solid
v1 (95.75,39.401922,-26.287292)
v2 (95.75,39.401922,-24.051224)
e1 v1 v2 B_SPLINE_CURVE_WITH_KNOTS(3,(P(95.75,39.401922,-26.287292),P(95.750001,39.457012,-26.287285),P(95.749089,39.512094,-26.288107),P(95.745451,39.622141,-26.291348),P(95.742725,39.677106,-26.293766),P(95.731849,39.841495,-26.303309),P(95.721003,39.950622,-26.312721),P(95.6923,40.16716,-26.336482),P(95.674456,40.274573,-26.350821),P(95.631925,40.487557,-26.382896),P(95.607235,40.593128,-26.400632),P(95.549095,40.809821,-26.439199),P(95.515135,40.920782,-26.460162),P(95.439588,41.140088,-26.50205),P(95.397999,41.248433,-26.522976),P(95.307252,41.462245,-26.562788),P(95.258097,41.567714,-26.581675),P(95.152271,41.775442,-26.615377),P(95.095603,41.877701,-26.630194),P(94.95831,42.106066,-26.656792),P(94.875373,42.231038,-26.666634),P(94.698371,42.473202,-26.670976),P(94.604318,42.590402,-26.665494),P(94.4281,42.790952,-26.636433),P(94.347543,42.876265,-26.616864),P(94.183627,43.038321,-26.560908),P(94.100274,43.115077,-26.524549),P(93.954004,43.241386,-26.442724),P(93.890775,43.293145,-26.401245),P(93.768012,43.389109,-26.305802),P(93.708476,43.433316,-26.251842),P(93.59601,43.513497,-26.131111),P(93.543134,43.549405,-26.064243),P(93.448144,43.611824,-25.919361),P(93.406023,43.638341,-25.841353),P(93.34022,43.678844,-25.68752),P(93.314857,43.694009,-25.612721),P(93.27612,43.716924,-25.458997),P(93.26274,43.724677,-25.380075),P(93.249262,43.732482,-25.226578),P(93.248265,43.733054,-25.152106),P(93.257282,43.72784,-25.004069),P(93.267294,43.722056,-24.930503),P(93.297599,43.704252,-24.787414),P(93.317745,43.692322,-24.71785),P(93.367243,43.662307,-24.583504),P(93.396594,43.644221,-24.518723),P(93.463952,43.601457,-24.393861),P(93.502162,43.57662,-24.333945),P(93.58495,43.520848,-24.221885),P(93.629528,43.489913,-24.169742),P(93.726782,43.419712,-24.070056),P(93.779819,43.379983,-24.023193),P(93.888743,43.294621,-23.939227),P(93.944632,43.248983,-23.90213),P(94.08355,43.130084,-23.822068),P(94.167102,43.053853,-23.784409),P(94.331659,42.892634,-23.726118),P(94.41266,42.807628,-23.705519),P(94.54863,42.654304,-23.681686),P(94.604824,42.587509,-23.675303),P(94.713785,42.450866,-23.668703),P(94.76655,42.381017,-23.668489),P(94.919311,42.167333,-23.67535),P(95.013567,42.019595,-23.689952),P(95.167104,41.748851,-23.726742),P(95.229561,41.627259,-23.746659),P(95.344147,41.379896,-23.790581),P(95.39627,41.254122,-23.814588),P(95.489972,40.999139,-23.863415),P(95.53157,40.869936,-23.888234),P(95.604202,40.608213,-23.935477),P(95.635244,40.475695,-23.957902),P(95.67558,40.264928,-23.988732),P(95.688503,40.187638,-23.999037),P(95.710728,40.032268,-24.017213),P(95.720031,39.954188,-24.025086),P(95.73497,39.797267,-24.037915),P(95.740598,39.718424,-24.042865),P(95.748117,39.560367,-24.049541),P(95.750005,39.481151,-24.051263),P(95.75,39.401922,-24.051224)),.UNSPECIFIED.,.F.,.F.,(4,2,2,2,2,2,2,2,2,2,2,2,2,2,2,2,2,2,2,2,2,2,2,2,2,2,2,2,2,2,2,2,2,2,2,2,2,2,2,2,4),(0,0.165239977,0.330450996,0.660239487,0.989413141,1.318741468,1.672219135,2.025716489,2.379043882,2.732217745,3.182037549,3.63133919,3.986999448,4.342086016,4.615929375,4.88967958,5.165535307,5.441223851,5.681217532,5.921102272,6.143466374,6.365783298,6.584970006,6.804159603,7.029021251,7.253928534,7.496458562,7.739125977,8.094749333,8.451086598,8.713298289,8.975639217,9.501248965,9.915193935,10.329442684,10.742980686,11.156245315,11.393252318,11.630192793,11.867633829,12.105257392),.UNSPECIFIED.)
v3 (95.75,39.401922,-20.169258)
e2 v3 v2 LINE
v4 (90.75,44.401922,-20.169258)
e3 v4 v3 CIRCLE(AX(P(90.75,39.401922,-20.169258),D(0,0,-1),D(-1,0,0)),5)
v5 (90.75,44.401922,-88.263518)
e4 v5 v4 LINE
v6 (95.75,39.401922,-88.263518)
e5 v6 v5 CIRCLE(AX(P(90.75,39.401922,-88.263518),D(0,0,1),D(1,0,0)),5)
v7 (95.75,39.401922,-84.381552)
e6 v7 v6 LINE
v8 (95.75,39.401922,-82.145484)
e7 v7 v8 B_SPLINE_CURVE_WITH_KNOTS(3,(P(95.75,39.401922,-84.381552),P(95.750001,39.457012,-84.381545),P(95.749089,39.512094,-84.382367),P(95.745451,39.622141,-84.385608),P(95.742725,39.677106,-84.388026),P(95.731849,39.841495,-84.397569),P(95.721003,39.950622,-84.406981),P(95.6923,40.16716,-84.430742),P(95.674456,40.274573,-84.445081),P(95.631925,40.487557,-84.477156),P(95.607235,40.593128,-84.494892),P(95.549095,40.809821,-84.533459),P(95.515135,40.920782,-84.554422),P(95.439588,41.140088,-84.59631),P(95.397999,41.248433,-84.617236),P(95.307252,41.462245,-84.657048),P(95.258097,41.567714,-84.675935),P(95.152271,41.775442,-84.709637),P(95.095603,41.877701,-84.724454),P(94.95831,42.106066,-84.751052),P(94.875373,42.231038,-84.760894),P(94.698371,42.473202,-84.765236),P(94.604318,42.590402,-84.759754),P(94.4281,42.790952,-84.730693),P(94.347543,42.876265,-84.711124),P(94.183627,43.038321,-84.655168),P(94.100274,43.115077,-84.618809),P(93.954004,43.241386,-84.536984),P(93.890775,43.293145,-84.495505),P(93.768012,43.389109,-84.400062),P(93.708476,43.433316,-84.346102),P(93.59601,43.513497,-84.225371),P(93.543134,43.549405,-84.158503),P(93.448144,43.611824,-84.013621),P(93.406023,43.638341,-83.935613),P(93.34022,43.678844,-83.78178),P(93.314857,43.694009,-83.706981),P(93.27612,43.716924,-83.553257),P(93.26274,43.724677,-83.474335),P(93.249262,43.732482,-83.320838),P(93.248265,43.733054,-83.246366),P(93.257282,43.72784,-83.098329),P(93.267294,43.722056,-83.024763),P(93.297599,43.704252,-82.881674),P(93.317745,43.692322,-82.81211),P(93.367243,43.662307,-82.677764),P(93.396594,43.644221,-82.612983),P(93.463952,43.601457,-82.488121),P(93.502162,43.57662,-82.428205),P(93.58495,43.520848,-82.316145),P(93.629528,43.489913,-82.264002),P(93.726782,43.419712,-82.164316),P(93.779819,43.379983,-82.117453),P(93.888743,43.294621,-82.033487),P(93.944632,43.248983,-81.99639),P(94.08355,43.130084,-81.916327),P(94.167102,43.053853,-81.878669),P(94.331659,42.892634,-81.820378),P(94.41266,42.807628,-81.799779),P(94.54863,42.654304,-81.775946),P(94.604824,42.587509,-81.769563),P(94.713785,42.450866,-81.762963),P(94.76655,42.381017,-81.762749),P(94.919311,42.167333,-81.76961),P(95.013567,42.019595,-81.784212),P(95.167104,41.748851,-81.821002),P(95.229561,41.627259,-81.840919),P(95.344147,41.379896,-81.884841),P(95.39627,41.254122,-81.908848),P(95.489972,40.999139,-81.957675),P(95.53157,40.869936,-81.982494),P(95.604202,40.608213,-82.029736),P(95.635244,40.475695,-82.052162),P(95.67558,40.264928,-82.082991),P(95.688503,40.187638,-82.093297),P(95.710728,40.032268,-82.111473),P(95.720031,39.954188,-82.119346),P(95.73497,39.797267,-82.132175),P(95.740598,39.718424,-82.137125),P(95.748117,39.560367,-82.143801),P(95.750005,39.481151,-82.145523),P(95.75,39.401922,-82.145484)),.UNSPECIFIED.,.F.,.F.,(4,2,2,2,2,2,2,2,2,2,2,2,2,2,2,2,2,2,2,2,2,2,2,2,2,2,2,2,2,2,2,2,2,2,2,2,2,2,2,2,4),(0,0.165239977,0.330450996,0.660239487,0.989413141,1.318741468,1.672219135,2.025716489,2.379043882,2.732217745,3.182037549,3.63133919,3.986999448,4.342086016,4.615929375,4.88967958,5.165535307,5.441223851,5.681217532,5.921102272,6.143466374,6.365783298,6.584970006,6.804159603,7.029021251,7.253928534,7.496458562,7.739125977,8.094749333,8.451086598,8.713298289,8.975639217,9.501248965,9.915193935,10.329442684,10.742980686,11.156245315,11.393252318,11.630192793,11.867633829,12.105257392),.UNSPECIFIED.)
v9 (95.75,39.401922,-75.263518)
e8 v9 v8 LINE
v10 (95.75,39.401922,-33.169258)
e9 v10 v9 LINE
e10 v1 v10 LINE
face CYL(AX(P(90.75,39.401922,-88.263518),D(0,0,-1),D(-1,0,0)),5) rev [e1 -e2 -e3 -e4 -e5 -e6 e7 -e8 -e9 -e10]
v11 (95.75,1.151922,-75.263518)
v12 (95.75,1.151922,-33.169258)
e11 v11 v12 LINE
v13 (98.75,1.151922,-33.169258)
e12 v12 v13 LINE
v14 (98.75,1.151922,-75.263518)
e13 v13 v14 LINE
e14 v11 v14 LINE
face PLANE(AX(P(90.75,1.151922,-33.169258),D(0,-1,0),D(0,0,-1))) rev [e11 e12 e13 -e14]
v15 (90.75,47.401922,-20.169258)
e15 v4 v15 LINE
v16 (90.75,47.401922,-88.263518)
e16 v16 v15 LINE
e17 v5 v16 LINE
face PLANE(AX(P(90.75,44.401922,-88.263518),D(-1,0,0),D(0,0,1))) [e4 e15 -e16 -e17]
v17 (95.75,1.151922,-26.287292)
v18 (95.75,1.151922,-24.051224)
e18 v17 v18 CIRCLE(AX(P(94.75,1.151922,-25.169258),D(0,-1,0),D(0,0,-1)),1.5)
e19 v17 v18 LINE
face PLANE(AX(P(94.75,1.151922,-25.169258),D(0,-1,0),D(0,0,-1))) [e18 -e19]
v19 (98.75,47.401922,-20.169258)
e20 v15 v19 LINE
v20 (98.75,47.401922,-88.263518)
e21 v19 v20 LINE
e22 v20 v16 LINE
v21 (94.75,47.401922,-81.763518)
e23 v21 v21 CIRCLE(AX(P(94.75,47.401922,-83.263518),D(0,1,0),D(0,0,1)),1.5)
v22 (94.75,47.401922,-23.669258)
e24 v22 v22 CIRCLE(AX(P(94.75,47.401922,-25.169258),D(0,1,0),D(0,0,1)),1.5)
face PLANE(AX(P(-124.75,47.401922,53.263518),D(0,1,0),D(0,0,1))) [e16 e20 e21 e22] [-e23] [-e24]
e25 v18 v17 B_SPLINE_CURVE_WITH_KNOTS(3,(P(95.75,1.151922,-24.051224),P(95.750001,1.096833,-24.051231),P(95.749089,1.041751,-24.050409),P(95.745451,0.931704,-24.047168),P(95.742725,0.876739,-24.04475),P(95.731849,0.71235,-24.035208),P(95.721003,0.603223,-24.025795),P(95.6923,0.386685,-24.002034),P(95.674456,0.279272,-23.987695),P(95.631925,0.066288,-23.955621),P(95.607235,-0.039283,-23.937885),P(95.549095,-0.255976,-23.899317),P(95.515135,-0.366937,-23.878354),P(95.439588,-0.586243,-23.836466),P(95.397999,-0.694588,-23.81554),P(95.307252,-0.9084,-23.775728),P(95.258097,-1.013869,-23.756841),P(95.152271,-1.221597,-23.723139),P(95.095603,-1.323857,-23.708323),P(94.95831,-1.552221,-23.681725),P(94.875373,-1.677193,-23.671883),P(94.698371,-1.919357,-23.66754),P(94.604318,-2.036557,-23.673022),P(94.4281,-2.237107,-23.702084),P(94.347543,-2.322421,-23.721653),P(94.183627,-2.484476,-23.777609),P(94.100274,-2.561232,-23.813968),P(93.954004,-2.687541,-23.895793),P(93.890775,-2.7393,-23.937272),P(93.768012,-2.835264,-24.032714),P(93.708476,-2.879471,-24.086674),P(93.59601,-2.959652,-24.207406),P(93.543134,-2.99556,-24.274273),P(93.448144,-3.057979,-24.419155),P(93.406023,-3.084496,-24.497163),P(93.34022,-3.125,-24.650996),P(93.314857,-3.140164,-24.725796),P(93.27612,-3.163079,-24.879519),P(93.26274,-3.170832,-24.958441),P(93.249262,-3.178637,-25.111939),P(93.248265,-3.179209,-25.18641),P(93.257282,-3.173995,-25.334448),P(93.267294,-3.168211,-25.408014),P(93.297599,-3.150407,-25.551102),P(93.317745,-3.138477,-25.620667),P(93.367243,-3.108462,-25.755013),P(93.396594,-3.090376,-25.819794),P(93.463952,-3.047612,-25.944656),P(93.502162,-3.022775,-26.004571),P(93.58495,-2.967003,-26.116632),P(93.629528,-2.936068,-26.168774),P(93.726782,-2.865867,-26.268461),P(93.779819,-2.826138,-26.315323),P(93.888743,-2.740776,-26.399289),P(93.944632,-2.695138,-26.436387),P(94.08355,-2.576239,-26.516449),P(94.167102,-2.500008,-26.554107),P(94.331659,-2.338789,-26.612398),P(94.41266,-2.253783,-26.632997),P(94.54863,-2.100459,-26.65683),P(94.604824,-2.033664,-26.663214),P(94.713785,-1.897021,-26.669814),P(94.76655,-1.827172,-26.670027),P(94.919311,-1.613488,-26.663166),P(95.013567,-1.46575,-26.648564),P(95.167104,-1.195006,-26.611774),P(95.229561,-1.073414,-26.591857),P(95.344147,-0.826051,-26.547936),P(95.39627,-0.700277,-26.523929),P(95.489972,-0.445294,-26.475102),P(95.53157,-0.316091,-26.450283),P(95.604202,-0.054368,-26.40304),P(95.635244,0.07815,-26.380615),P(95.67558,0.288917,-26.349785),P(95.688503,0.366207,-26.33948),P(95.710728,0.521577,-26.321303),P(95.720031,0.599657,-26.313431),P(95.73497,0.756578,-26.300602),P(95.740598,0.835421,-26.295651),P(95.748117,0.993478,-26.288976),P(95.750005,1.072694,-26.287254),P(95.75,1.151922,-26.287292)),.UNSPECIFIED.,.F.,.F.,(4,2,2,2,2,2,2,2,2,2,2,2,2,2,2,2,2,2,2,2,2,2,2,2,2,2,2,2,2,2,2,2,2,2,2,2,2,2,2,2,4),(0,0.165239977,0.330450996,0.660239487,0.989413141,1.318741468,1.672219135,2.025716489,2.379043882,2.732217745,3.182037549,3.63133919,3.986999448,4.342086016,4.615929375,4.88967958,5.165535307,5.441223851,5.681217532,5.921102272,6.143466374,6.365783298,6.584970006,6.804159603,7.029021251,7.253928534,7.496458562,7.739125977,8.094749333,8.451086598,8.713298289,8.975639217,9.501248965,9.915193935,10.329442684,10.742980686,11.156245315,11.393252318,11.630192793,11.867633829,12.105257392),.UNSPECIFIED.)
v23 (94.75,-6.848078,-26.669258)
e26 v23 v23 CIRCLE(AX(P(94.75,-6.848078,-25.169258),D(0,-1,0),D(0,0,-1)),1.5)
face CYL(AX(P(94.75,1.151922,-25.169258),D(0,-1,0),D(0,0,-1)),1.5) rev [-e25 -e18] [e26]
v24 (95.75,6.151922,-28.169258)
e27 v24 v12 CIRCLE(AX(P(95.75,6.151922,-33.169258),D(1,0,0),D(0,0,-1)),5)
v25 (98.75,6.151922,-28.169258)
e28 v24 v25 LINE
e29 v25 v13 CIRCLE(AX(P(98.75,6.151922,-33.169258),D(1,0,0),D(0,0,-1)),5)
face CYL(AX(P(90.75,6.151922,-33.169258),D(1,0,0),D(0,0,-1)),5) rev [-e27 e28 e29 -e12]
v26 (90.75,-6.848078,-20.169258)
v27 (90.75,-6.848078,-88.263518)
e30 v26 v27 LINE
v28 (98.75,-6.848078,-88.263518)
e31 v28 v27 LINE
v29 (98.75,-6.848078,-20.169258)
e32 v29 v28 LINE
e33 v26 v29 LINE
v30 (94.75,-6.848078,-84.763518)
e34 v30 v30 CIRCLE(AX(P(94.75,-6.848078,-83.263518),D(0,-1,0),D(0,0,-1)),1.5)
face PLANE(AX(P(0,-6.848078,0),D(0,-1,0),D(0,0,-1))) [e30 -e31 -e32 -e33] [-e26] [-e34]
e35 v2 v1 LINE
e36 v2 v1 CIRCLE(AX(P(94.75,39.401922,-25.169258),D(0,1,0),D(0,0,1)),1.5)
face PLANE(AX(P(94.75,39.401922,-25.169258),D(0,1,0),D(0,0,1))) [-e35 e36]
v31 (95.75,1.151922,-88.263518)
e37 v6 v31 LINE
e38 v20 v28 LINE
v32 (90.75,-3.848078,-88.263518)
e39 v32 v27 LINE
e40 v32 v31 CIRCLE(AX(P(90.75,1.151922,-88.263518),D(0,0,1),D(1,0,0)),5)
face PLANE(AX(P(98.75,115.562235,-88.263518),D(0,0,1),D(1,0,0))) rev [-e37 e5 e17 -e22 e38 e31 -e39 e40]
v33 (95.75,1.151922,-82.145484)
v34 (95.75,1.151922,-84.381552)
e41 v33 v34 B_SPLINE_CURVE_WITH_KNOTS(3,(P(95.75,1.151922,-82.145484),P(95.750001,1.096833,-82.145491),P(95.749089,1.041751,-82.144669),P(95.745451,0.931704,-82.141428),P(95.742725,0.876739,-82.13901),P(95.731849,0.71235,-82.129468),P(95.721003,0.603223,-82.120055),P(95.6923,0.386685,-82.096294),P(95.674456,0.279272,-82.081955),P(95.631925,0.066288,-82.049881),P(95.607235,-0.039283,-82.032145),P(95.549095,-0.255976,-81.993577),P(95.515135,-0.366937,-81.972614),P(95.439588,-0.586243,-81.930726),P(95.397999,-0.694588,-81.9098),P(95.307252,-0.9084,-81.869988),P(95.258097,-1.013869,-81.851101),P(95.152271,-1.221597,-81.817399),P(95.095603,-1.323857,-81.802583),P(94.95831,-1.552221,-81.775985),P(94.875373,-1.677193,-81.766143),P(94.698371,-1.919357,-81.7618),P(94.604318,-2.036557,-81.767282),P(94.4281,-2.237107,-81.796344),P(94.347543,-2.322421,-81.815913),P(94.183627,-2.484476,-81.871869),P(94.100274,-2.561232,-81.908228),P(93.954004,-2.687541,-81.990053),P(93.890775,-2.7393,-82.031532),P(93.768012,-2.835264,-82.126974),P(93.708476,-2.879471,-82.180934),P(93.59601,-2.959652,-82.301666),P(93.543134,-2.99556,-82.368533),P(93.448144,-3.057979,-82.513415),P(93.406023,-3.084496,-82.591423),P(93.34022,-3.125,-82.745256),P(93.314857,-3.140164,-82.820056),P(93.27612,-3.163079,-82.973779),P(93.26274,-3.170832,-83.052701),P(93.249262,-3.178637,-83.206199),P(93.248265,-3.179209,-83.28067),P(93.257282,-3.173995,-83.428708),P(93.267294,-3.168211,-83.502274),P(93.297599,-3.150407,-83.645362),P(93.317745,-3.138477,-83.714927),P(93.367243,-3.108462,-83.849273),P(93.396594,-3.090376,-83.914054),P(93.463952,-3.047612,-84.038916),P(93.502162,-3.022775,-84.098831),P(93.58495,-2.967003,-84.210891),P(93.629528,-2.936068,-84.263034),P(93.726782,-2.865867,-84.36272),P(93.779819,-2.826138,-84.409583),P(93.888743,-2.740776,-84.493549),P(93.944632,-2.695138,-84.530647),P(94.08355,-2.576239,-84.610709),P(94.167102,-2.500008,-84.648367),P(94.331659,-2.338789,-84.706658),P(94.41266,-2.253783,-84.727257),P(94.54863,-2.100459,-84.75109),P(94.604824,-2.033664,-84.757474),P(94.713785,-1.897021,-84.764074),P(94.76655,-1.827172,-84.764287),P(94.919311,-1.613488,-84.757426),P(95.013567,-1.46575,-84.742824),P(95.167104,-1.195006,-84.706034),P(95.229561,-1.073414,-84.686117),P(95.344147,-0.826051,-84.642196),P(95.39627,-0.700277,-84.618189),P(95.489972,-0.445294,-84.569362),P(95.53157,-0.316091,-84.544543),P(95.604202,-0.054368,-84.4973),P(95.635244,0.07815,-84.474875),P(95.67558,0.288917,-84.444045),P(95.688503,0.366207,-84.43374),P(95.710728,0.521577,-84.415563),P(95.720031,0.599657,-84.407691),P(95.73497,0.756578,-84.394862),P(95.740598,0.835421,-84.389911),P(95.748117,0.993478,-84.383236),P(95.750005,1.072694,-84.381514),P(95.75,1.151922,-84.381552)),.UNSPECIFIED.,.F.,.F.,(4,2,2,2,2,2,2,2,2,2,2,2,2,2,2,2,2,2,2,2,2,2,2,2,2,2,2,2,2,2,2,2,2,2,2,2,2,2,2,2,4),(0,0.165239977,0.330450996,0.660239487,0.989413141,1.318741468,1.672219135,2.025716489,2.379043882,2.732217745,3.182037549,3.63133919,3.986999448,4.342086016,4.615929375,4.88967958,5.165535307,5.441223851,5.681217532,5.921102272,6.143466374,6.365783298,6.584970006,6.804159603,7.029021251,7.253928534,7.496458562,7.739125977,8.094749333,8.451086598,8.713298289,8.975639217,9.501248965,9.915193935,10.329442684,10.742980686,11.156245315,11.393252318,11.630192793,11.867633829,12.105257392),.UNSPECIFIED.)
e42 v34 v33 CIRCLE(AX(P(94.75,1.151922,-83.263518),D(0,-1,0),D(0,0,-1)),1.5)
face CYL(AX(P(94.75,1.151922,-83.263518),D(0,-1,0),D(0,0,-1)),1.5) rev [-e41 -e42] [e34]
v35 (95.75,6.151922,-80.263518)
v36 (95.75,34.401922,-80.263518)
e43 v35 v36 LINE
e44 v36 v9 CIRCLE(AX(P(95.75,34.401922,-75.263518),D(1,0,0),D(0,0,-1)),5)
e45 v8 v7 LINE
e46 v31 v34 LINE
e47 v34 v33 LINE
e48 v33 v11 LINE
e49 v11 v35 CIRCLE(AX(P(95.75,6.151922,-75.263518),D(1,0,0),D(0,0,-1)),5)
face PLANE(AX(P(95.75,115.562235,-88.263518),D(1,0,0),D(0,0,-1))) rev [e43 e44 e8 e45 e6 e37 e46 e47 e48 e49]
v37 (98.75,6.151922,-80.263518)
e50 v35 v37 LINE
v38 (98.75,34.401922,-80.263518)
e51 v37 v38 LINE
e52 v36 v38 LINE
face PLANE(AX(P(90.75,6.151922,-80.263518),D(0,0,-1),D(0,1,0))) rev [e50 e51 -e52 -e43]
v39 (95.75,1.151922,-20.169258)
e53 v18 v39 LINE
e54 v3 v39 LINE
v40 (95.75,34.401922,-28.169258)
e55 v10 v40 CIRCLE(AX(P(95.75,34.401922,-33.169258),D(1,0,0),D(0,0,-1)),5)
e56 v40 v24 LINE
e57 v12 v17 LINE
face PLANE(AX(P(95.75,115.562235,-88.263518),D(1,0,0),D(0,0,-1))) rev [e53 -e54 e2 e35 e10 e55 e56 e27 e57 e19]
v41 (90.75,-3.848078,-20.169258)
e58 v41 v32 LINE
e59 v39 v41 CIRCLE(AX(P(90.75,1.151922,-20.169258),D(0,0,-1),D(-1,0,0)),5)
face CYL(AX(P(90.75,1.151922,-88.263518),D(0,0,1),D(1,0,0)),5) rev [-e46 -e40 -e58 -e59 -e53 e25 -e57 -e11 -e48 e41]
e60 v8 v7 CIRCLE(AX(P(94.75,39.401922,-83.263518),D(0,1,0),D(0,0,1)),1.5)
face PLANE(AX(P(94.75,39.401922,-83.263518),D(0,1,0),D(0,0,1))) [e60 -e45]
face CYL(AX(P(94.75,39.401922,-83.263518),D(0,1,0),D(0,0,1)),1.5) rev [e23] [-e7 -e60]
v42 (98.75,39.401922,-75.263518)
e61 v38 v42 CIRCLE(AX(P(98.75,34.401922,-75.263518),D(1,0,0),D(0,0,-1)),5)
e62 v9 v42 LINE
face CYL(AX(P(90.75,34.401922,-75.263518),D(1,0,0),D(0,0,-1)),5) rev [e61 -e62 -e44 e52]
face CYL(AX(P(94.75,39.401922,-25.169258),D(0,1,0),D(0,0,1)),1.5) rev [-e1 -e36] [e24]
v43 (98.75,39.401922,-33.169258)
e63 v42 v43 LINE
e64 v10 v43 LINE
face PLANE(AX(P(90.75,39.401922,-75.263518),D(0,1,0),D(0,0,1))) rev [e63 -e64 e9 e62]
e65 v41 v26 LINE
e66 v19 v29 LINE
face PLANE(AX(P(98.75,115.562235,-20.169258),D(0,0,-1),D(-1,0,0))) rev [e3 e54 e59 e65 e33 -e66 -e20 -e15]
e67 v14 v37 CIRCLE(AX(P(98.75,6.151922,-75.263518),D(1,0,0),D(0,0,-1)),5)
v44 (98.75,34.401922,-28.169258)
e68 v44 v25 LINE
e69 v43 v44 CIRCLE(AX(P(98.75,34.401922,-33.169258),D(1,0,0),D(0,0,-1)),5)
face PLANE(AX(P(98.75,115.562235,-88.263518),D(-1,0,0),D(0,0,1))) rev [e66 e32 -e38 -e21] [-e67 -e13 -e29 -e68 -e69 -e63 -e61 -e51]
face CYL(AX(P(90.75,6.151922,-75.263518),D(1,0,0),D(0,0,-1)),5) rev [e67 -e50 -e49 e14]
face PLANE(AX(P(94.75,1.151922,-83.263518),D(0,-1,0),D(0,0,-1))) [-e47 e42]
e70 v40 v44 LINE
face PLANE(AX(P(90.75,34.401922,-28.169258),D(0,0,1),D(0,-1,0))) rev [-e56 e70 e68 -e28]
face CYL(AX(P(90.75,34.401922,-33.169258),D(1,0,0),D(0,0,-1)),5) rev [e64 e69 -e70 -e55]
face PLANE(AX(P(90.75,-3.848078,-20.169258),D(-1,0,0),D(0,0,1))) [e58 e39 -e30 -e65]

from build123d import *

# Parameters (mm, degrees)
SKETCH1_W                         = 3
SKETCH1_H                         = 68.094259971
MAIN_EXTRUDE_DEPTH                = 54.25
SKETCH2_W                         = 8
SKETCH2_H                         = 68.094259971
TOP_SCREWHOLE_EXTENSION_DEPTH     = 3
SKETCH3_W                         = 8
SKETCH3_H                         = 68.094259971
BOTTOM_SCREWHOLE_EXTENSION_DEPTH  = 3
SCREWHOLE_EXTENSION_FILLETS_5MM_R = 5
SKETCH4_R                         = 1.5
BOTTOM_SCREWHOLES_DEPTH           = 8
TOP_START                         = -8
SKETCH5_R                         = 1.5
TOP_SCREWHOLES_DEPTH              = 8
WEIGHT_REDUCTION_DEPTH            = 101.505676109
WEIGHT_REDUCTION_DEPTH_BACK       = 101.505676109


with BuildPart() as part:
    # Sketch1 → Main extrude (new body)
    with BuildSketch(Plane(origin=(0, -6.84807753, 0), x_dir=(1, 0, 0), z_dir=(0, 1, 0))):
        with Locations((97.25, 54.216388238)):
            Rectangle(SKETCH1_W, SKETCH1_H)
    extrude(amount=MAIN_EXTRUDE_DEPTH)

    # Sketch2 → Top screwhole extension (add)
    with BuildSketch(Plane(origin=(0, 47.40192247, 0), x_dir=(1, 0, 0), z_dir=(0, 1, 0))):
        with Locations((94.75, 54.216388238)):
            Rectangle(SKETCH2_W, SKETCH2_H)
    extrude(amount=-TOP_SCREWHOLE_EXTENSION_DEPTH)

    # Sketch3 → Bottom screwhole extension (add)
    with BuildSketch(Plane.XZ.offset(6.84807753)):
        with Locations((94.75, -54.216388238)):
            Rectangle(SKETCH3_W, SKETCH3_H)
    extrude(amount=-BOTTOM_SCREWHOLE_EXTENSION_DEPTH)

    # Screwhole extension fillets 5mm
    screwhole_extension_fillets_5mm_edges = [part.edges().sort_by_distance(p)[0] for p in [
        (95.75, 44.40192247, -54.216388238),
        (95.75, -3.84807753, -54.216388238),
    ]]
    fillet(screwhole_extension_fillets_5mm_edges, radius=SCREWHOLE_EXTENSION_FILLETS_5MM_R - 0.0001)  # a hair under: the kernel refuses the full size

    # Sketch4 → Bottom screwholes (cut)
    with BuildSketch(Plane.XZ.offset(6.84807753)):
        with Locations(Location((94.75, -25.169258252, 0), (0, 0, 270))):
            Circle(SKETCH4_R)
        with Locations(Location((94.75, -83.263518223, 0), (0, 0, 270))):
            Circle(SKETCH4_R)
    extrude(amount=-BOTTOM_SCREWHOLES_DEPTH, mode=Mode.SUBTRACT)

    # Sketch5 → Top screwholes (cut)
    with BuildSketch(Plane(origin=(0, 47.40192247, 0), x_dir=(1, 0, 0), z_dir=(0, 1, 0)).offset(TOP_START)):
        with Locations(Location((94.75, 25.169258252, 0), (0, 0, 90))):
            Circle(SKETCH5_R)
        with Locations(Location((94.75, 83.263518223, 0), (0, 0, 90))):
            Circle(SKETCH5_R)
    extrude(amount=TOP_SCREWHOLES_DEPTH, mode=Mode.SUBTRACT)

    # Sketch6 → Weight reduction (cut, two sides: drawn at the far end of the back side and taken through both)
    with BuildSketch(Plane(origin=(98.75, 0, 0), x_dir=(0, 0, -1), z_dir=(1, 0, 0)).offset(-WEIGHT_REDUCTION_DEPTH_BACK)):
        with BuildLine():
            Line((28.169258252, 34.40192247), (28.169258252, 6.15192247))
            ThreePointArc((28.169258252, 6.15192247), (29.633724346, 2.616388564), (33.169258252, 1.15192247))
            Line((33.169258252, 1.15192247), (75.263518223, 1.15192247))
            ThreePointArc((75.263518223, 1.15192247), (78.799052129, 2.616388564), (80.263518223, 6.15192247))
            Line((80.263518223, 6.15192247), (80.263518223, 34.40192247))
            ThreePointArc((80.263518223, 34.40192247), (78.799052129, 37.937456376), (75.263518223, 39.40192247))
            Line((75.263518223, 39.40192247), (33.169258252, 39.40192247))
            ThreePointArc((33.169258252, 39.40192247), (29.633724346, 37.937456376), (28.169258252, 34.40192247))
        make_face()
    extrude(amount=WEIGHT_REDUCTION_DEPTH + WEIGHT_REDUCTION_DEPTH_BACK, mode=Mode.SUBTRACT)


solid = part.part
